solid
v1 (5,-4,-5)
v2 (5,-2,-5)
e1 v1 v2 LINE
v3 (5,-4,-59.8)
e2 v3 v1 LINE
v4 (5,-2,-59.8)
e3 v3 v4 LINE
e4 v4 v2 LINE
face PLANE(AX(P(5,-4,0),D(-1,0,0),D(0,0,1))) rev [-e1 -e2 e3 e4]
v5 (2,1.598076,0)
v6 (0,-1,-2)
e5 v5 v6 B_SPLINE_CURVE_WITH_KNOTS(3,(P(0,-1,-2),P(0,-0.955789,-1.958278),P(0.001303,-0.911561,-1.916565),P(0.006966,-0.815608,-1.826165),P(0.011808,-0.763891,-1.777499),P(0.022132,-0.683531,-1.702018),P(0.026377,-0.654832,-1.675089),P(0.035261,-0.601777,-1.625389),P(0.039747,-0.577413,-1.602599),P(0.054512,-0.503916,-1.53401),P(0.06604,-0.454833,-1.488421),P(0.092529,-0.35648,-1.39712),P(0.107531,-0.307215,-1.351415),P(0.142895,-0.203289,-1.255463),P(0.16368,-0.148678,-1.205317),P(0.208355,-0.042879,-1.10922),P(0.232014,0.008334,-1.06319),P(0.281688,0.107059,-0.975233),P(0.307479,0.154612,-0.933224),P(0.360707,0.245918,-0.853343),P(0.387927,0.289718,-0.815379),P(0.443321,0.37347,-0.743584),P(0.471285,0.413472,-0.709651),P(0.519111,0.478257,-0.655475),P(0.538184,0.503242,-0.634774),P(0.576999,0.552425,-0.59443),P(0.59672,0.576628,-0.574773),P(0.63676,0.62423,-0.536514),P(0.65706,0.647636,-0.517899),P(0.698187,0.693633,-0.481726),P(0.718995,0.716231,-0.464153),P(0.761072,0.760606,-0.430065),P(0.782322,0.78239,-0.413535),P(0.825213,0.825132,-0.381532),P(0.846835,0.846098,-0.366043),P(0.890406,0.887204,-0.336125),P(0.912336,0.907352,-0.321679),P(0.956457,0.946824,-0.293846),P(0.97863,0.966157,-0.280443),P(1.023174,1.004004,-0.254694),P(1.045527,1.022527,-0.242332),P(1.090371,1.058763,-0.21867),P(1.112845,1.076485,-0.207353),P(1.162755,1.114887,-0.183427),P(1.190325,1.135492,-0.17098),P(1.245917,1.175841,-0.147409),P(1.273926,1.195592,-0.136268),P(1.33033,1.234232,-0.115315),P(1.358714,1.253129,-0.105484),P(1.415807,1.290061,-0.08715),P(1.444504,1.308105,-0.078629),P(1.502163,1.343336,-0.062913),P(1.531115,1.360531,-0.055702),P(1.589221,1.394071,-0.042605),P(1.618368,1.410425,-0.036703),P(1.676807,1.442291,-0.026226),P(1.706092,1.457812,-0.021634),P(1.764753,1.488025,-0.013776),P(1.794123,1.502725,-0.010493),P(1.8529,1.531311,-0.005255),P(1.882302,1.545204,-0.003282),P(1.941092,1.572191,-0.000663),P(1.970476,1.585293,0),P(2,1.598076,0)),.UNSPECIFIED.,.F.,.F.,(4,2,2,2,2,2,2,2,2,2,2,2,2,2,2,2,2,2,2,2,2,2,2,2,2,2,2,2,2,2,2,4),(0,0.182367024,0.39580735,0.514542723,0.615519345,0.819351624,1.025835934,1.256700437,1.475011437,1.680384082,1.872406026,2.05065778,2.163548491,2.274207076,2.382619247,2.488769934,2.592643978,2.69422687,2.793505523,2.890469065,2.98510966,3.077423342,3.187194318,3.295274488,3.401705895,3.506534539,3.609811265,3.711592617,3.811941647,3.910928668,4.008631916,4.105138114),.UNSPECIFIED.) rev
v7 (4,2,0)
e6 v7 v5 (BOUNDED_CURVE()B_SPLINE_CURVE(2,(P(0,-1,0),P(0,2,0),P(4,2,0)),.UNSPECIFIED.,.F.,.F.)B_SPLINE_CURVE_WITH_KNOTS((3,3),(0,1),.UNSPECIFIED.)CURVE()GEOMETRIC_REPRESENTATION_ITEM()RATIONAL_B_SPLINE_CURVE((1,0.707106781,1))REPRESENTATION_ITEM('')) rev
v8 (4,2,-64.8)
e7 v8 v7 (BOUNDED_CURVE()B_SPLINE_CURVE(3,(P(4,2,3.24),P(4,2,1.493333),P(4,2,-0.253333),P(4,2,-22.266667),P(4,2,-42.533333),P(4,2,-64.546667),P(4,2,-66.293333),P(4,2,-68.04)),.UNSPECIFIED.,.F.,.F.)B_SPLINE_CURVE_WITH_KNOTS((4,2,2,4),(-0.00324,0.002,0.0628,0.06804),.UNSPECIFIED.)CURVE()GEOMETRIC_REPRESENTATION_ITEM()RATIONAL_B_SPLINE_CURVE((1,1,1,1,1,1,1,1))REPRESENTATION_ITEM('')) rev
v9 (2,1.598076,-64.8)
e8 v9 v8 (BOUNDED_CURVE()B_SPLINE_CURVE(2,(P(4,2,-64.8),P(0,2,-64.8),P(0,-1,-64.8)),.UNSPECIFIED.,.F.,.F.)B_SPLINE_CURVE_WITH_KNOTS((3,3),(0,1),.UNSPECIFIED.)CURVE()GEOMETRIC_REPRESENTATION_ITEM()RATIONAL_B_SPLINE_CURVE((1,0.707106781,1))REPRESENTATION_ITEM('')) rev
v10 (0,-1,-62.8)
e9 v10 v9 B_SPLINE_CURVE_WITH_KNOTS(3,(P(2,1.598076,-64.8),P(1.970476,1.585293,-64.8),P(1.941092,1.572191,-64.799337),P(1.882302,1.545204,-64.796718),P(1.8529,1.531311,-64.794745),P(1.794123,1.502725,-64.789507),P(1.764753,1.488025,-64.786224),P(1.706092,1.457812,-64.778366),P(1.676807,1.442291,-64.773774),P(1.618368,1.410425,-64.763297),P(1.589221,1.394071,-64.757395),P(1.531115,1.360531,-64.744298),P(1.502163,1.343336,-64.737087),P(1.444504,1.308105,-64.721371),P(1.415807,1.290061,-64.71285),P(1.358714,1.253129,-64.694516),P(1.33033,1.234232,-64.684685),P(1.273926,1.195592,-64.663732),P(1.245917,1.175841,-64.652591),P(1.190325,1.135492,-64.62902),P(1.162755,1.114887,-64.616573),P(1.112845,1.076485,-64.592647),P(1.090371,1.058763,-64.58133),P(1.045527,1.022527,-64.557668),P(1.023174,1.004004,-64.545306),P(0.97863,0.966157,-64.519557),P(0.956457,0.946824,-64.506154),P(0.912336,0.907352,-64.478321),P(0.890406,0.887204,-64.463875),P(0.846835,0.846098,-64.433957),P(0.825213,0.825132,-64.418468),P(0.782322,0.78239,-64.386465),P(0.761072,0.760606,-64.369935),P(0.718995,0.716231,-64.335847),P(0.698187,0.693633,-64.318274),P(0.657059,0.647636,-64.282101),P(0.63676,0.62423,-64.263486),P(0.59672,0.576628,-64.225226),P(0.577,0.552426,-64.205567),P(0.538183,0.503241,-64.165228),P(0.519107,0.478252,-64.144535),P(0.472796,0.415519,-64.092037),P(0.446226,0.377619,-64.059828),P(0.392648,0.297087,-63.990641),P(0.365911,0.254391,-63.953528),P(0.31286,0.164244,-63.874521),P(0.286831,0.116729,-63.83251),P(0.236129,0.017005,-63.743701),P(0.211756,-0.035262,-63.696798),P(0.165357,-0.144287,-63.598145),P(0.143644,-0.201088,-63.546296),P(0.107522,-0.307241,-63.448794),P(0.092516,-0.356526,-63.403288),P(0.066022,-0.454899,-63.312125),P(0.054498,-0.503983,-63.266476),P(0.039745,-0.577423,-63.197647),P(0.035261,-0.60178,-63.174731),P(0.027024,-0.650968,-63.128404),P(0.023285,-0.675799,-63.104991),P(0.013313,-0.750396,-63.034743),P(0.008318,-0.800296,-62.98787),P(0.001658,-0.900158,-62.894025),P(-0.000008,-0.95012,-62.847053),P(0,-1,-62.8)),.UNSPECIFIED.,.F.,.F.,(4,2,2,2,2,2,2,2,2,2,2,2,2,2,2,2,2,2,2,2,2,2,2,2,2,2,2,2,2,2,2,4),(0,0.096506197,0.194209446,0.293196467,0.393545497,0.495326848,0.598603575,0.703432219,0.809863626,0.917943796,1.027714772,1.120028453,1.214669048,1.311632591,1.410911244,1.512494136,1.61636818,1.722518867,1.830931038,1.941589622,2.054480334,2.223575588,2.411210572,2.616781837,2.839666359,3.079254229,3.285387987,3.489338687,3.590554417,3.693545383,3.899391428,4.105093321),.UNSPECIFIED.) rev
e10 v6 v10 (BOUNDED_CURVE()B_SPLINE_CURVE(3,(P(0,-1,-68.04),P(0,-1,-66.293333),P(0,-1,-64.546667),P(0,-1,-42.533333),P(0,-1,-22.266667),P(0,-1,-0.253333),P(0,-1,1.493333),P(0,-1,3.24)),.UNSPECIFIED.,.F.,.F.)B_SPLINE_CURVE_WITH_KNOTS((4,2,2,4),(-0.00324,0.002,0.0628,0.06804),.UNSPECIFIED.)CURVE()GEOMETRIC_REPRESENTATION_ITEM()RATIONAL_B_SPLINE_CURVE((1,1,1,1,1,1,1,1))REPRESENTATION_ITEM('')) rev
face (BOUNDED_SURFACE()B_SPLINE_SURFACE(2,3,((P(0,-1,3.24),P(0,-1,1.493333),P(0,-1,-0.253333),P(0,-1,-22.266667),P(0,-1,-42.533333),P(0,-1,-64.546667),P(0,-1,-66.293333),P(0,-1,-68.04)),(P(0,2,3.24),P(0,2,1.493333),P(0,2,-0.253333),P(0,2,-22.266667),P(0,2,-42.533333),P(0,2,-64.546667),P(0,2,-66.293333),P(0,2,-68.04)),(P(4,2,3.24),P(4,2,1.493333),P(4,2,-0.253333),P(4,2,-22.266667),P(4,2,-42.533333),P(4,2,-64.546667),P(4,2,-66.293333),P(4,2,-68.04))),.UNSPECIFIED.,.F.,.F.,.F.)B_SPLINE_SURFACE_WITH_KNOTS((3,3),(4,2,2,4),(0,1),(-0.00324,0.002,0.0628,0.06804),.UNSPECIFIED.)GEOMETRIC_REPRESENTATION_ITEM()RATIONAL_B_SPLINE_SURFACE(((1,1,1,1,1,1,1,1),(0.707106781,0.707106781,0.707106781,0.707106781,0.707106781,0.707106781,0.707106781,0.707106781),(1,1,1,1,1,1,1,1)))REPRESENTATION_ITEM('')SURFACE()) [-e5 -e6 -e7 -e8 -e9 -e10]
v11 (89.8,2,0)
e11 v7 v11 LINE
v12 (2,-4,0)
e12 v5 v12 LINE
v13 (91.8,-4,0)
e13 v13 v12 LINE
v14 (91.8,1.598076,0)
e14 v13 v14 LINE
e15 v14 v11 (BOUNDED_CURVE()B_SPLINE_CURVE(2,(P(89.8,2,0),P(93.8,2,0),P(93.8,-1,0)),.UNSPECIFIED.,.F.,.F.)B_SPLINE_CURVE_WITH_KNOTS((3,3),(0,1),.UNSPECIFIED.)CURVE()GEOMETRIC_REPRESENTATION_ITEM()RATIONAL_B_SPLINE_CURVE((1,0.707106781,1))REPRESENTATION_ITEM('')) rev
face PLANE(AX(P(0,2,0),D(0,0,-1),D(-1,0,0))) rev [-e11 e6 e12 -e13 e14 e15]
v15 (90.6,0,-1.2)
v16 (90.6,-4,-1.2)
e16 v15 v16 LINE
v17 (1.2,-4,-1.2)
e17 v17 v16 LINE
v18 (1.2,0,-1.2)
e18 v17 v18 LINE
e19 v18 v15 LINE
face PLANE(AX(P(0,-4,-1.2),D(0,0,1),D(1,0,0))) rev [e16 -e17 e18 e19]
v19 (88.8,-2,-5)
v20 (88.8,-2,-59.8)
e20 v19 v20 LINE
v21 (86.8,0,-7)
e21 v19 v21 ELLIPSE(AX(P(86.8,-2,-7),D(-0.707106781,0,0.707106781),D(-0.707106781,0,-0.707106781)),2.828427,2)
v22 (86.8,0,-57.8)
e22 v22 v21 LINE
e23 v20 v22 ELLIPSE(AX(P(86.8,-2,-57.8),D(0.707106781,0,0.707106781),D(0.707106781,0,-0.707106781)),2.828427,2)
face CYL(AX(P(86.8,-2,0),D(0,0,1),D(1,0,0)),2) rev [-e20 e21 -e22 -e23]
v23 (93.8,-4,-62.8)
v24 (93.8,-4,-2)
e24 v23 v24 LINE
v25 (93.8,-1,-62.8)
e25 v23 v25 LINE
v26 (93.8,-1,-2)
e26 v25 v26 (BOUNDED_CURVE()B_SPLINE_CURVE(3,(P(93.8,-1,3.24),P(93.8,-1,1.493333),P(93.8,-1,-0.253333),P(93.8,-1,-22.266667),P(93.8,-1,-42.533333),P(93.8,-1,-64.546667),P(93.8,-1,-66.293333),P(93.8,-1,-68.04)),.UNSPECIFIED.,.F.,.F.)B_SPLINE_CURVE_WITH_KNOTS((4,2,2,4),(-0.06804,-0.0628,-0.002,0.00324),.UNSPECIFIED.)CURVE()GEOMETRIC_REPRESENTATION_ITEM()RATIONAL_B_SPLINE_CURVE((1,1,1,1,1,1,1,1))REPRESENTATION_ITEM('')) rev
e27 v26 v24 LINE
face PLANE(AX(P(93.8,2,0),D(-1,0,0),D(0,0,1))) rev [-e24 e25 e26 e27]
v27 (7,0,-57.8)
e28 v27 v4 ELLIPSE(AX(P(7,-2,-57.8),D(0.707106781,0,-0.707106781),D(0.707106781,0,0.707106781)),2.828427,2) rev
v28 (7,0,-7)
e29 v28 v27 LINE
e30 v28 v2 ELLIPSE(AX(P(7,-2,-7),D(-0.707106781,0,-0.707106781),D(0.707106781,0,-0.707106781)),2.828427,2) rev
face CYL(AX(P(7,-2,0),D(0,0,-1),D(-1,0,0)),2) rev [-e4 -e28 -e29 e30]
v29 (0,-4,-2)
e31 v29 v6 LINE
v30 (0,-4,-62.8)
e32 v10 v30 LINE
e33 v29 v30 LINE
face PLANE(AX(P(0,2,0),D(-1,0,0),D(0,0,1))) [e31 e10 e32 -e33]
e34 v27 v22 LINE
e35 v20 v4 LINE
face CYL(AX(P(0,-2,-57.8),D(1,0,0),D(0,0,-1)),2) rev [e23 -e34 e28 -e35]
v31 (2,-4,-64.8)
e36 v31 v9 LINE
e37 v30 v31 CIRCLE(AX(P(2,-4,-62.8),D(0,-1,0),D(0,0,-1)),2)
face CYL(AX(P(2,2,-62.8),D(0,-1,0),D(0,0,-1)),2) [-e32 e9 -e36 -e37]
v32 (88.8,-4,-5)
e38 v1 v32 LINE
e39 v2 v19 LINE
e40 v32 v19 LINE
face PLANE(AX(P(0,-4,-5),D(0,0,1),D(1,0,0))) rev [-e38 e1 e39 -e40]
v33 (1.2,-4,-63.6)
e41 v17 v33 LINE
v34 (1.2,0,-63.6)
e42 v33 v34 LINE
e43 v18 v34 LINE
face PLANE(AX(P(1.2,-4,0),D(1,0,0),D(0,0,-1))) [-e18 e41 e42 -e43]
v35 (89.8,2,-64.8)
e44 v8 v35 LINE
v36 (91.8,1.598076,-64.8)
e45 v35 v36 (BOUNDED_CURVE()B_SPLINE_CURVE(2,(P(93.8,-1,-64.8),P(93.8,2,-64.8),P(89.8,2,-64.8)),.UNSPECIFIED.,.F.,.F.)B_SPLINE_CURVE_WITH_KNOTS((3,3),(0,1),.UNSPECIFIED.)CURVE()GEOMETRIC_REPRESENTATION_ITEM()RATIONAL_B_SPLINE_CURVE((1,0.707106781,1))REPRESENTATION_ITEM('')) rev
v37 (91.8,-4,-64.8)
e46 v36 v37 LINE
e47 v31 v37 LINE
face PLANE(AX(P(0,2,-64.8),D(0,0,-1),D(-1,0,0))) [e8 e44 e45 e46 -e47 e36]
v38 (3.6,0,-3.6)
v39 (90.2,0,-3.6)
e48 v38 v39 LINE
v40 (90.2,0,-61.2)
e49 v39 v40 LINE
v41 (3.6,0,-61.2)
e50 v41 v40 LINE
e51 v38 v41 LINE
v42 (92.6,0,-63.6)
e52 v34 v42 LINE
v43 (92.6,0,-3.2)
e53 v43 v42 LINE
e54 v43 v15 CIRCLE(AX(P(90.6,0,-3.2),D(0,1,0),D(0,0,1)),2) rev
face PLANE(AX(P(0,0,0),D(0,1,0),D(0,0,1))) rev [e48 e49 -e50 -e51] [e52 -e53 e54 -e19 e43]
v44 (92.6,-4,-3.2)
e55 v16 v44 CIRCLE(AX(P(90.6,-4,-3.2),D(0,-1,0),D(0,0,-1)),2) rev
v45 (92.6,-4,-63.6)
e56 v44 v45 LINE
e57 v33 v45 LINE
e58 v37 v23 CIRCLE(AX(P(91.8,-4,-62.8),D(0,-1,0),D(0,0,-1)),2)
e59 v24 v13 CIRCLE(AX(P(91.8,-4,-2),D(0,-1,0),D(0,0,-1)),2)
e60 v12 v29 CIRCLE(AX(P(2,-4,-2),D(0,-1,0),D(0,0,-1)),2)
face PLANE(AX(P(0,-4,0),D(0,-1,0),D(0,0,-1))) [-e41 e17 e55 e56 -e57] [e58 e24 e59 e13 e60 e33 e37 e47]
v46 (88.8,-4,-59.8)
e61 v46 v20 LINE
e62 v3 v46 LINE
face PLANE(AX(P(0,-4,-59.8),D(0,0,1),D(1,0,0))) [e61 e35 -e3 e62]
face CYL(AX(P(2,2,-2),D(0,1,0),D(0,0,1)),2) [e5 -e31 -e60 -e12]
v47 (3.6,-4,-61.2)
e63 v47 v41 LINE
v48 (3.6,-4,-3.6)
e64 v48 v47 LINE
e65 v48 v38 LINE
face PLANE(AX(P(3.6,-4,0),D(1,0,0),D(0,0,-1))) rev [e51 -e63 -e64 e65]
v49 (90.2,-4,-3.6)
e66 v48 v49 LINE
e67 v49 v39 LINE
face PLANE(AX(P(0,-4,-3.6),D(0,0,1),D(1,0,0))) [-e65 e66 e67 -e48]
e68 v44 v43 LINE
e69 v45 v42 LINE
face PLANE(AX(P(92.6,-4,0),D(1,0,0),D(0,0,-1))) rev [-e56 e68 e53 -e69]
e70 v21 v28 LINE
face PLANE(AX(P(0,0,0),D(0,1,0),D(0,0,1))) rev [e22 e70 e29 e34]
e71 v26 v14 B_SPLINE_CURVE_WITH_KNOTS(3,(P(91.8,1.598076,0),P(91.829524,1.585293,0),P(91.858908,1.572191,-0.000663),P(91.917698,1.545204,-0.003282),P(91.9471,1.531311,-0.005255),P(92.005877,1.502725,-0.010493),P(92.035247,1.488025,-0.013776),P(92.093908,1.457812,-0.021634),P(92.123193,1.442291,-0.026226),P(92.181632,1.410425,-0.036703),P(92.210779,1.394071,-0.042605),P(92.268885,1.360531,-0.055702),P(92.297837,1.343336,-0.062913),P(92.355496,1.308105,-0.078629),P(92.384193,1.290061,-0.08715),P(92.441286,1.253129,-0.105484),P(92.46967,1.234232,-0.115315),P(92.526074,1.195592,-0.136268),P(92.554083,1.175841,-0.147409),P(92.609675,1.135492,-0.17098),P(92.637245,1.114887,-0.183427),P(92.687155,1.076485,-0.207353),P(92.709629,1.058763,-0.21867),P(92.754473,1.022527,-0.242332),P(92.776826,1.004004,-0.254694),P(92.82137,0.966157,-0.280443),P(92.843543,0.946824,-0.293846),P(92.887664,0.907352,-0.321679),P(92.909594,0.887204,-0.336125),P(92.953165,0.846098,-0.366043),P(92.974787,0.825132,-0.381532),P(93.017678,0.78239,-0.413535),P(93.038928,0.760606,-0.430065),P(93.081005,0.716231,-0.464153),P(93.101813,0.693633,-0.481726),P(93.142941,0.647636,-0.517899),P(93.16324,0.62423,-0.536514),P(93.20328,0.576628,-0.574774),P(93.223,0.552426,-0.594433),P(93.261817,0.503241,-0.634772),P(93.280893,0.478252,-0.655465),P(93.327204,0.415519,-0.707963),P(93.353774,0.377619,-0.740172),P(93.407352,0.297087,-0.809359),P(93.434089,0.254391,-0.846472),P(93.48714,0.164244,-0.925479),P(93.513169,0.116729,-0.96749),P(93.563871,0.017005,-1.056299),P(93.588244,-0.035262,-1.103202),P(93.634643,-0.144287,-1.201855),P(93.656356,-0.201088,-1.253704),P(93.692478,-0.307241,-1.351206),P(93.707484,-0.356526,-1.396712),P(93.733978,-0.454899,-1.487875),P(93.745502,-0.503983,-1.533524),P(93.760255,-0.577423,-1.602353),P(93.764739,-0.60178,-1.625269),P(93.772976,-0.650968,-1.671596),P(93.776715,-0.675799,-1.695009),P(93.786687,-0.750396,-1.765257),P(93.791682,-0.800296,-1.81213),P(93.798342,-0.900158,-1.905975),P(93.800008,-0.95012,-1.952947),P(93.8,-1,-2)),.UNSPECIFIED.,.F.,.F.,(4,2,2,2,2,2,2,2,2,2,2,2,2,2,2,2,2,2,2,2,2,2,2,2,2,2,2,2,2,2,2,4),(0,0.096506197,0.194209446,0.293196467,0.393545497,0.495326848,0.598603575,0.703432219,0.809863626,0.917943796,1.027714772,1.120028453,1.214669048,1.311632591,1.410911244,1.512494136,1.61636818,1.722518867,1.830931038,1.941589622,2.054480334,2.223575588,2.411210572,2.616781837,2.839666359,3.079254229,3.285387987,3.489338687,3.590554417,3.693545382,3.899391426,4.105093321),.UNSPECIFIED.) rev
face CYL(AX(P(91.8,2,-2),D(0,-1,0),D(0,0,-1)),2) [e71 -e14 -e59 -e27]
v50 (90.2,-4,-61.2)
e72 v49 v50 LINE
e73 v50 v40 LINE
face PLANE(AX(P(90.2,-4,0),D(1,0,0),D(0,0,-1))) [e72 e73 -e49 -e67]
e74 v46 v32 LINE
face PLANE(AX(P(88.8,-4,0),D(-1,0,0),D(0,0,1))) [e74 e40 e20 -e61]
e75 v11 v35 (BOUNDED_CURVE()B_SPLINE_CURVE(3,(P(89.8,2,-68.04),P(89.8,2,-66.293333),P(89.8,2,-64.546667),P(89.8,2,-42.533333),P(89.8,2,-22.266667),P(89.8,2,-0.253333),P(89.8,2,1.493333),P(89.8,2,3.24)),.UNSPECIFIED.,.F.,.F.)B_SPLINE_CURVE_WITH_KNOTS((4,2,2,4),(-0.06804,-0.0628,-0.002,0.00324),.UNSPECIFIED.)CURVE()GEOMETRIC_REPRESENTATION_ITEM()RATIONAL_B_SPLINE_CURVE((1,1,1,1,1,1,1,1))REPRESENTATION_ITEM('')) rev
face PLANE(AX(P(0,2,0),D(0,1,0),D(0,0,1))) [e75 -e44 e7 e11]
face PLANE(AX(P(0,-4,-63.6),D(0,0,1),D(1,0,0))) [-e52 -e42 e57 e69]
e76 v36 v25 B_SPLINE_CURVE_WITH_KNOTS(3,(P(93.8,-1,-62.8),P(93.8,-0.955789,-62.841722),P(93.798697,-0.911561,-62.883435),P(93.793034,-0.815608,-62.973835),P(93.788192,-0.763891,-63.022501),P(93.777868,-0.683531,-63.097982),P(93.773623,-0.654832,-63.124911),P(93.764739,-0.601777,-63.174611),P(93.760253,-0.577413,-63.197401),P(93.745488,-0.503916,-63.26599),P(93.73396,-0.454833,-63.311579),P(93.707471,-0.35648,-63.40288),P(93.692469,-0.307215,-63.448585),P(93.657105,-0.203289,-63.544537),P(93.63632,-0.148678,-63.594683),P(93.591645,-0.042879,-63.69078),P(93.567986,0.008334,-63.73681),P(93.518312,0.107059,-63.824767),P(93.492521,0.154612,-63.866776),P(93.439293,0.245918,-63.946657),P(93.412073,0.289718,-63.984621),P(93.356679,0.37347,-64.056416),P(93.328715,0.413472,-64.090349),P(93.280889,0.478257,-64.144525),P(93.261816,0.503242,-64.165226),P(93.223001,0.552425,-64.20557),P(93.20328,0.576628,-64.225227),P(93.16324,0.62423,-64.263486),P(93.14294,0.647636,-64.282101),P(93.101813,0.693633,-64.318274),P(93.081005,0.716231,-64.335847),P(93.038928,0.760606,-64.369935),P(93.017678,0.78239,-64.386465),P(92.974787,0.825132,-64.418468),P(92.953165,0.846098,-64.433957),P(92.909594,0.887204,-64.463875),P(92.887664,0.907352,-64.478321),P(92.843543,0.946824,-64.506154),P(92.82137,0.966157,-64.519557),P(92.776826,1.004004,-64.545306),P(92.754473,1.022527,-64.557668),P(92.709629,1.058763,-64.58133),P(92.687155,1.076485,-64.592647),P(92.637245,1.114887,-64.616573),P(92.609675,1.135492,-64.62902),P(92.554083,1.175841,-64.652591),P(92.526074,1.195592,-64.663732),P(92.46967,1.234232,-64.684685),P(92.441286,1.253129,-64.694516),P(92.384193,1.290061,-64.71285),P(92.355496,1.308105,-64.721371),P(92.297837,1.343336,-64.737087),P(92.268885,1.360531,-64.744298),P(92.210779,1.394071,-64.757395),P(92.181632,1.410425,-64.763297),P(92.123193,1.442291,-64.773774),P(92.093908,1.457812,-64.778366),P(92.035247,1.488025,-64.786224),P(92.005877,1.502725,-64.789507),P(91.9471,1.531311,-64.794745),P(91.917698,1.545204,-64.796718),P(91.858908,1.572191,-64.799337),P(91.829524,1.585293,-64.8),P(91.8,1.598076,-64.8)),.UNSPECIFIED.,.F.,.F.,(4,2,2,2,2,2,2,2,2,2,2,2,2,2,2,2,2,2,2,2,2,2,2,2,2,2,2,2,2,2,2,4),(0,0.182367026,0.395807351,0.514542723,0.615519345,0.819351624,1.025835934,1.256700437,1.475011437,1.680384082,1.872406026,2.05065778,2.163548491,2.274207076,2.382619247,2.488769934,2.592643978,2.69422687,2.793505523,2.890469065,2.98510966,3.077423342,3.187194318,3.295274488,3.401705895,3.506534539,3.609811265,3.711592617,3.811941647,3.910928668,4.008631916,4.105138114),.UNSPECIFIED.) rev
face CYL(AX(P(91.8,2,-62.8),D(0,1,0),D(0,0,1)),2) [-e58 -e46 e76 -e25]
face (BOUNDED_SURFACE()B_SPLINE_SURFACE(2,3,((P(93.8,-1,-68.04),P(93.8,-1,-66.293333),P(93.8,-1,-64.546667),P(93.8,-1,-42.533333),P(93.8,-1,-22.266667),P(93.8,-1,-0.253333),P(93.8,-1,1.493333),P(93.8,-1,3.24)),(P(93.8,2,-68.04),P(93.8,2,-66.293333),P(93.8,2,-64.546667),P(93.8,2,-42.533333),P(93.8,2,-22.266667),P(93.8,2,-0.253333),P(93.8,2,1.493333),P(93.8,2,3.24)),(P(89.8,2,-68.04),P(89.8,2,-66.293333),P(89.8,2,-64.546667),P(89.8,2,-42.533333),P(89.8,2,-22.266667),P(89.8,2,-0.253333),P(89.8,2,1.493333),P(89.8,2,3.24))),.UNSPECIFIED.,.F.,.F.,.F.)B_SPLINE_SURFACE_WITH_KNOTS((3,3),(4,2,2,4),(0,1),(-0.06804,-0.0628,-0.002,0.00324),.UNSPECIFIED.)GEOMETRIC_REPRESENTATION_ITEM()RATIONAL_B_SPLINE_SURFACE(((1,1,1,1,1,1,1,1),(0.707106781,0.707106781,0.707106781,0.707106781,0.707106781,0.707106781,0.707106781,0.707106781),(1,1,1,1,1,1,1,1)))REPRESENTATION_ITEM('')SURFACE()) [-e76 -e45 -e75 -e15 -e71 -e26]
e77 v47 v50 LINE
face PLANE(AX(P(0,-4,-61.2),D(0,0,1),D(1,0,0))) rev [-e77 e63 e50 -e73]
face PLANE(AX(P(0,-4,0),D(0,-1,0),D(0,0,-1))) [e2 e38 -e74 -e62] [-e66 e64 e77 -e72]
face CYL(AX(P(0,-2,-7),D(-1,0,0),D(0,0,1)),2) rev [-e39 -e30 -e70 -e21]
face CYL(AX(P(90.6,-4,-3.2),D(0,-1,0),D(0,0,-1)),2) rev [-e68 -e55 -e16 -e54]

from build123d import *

# Parameters (mm, degrees)
SKETCH1_W           = 93.8
SKETCH1_H           = 32.4
BOSS_EXTRUDE1_DEPTH = 2
SKETCH3_W           = 93.8
SKETCH3_H           = 64.8
SKETCH3_W_2         = 91.4
SKETCH3_H_2         = 62.4
SKETCH3_W_3         = 86.6
SKETCH3_H_3         = 57.6
SKETCH3_W_4         = 83.8
SKETCH3_H_4         = 54.8
BOSS_EXTRUDE2_DEPTH = 4
FILLET6_R           = 2
FILLET8_START       = -66
FILLET8_DEPTH       = 67
FILLET9_R           = 2
FILLET10_R          = 2


with BuildPart() as part:
    # Sketch1 → Boss-Extrude1 (new body)
    with BuildSketch(Plane(origin=(0, 0, 0), x_dir=(1, 0, 0), z_dir=(0, 1, 0))):
        with Locations((46.9, 48.6)):
            Rectangle(SKETCH1_W, SKETCH1_H)
        Polygon((93.8, 32.4), (0, 32.4), (0, 0), (42.9, 0), (50.9, 0), (93.8, 0), align=None)
    extrude(amount=BOSS_EXTRUDE1_DEPTH)

    # Sketch3 → Boss-Extrude2 (add)
    # profile 1 of 2: a face of its own
    with BuildSketch(Plane.XZ):
        with Locations((46.9, -32.4)):
            Rectangle(SKETCH3_W, SKETCH3_H)
        with Locations((46.9, -32.4)):
            Rectangle(SKETCH3_W_2, SKETCH3_H_2, mode=Mode.SUBTRACT)
    # profile 2 of 2: a face of its own
    with BuildSketch(Plane.XZ):
        with Locations((46.9, -32.4)):
            Rectangle(SKETCH3_W_3, SKETCH3_H_3)
        with Locations((46.9, -32.4)):
            Rectangle(SKETCH3_W_4, SKETCH3_H_4, mode=Mode.SUBTRACT)
    extrude(amount=BOSS_EXTRUDE2_DEPTH)

    # Fillet6
    fillet6_edges = [part.edges().sort_by_distance(p)[0] for p in [
        (0, -1, -64.8),
        (93.8, -1, -64.8),
        (93.8, -1, 0),
        (0, -1, 0),
    ]]
    fillet(fillet6_edges, radius=FILLET6_R)

    # Fillet8: read off the stored shape, not the designer's step
    # Fillet8 outline → Fillet8 (cut)
    with BuildSketch(Plane.XY.offset(FILLET8_START)):
        with BuildLine():
            add(Edge.make_bspline(
                [(0, -1), (0, 2), (4, 2)],
                knots=[0, 0, 0, 1, 1, 1], degree=2, weights=[1, 0.707106781, 1]))
            Line((4, 2), (0, 2))
            Line((0, 2), (0, -1))
        make_face()
        with BuildLine():
            add(Edge.make_bspline(
                [(93.8, -1), (93.8, 2), (89.8, 2)],
                knots=[0, 0, 0, 1, 1, 1], degree=2, weights=[1, 0.707106781, 1]))
            Line((93.8, -1), (93.8, 2))
            Line((93.8, 2), (89.8, 2))
        make_face()
    extrude(amount=FILLET8_DEPTH, mode=Mode.SUBTRACT)

    # Fillet9
    fillet9_edges = [part.edges().sort_by_distance(p)[0] for p in [
        (5, 0, -32.4),
        (46.9, 0, -5),
        (88.8, 0, -32.4),
        (46.9, 0, -59.8),
    ]]
    fillet(fillet9_edges, radius=FILLET9_R)

    # Fillet10
    fillet10_edges = [part.edges().sort_by_distance(p)[0] for p in [
        (92.6, -2, -1.2),
    ]]
    fillet(fillet10_edges, radius=FILLET10_R)


solid = part.part
